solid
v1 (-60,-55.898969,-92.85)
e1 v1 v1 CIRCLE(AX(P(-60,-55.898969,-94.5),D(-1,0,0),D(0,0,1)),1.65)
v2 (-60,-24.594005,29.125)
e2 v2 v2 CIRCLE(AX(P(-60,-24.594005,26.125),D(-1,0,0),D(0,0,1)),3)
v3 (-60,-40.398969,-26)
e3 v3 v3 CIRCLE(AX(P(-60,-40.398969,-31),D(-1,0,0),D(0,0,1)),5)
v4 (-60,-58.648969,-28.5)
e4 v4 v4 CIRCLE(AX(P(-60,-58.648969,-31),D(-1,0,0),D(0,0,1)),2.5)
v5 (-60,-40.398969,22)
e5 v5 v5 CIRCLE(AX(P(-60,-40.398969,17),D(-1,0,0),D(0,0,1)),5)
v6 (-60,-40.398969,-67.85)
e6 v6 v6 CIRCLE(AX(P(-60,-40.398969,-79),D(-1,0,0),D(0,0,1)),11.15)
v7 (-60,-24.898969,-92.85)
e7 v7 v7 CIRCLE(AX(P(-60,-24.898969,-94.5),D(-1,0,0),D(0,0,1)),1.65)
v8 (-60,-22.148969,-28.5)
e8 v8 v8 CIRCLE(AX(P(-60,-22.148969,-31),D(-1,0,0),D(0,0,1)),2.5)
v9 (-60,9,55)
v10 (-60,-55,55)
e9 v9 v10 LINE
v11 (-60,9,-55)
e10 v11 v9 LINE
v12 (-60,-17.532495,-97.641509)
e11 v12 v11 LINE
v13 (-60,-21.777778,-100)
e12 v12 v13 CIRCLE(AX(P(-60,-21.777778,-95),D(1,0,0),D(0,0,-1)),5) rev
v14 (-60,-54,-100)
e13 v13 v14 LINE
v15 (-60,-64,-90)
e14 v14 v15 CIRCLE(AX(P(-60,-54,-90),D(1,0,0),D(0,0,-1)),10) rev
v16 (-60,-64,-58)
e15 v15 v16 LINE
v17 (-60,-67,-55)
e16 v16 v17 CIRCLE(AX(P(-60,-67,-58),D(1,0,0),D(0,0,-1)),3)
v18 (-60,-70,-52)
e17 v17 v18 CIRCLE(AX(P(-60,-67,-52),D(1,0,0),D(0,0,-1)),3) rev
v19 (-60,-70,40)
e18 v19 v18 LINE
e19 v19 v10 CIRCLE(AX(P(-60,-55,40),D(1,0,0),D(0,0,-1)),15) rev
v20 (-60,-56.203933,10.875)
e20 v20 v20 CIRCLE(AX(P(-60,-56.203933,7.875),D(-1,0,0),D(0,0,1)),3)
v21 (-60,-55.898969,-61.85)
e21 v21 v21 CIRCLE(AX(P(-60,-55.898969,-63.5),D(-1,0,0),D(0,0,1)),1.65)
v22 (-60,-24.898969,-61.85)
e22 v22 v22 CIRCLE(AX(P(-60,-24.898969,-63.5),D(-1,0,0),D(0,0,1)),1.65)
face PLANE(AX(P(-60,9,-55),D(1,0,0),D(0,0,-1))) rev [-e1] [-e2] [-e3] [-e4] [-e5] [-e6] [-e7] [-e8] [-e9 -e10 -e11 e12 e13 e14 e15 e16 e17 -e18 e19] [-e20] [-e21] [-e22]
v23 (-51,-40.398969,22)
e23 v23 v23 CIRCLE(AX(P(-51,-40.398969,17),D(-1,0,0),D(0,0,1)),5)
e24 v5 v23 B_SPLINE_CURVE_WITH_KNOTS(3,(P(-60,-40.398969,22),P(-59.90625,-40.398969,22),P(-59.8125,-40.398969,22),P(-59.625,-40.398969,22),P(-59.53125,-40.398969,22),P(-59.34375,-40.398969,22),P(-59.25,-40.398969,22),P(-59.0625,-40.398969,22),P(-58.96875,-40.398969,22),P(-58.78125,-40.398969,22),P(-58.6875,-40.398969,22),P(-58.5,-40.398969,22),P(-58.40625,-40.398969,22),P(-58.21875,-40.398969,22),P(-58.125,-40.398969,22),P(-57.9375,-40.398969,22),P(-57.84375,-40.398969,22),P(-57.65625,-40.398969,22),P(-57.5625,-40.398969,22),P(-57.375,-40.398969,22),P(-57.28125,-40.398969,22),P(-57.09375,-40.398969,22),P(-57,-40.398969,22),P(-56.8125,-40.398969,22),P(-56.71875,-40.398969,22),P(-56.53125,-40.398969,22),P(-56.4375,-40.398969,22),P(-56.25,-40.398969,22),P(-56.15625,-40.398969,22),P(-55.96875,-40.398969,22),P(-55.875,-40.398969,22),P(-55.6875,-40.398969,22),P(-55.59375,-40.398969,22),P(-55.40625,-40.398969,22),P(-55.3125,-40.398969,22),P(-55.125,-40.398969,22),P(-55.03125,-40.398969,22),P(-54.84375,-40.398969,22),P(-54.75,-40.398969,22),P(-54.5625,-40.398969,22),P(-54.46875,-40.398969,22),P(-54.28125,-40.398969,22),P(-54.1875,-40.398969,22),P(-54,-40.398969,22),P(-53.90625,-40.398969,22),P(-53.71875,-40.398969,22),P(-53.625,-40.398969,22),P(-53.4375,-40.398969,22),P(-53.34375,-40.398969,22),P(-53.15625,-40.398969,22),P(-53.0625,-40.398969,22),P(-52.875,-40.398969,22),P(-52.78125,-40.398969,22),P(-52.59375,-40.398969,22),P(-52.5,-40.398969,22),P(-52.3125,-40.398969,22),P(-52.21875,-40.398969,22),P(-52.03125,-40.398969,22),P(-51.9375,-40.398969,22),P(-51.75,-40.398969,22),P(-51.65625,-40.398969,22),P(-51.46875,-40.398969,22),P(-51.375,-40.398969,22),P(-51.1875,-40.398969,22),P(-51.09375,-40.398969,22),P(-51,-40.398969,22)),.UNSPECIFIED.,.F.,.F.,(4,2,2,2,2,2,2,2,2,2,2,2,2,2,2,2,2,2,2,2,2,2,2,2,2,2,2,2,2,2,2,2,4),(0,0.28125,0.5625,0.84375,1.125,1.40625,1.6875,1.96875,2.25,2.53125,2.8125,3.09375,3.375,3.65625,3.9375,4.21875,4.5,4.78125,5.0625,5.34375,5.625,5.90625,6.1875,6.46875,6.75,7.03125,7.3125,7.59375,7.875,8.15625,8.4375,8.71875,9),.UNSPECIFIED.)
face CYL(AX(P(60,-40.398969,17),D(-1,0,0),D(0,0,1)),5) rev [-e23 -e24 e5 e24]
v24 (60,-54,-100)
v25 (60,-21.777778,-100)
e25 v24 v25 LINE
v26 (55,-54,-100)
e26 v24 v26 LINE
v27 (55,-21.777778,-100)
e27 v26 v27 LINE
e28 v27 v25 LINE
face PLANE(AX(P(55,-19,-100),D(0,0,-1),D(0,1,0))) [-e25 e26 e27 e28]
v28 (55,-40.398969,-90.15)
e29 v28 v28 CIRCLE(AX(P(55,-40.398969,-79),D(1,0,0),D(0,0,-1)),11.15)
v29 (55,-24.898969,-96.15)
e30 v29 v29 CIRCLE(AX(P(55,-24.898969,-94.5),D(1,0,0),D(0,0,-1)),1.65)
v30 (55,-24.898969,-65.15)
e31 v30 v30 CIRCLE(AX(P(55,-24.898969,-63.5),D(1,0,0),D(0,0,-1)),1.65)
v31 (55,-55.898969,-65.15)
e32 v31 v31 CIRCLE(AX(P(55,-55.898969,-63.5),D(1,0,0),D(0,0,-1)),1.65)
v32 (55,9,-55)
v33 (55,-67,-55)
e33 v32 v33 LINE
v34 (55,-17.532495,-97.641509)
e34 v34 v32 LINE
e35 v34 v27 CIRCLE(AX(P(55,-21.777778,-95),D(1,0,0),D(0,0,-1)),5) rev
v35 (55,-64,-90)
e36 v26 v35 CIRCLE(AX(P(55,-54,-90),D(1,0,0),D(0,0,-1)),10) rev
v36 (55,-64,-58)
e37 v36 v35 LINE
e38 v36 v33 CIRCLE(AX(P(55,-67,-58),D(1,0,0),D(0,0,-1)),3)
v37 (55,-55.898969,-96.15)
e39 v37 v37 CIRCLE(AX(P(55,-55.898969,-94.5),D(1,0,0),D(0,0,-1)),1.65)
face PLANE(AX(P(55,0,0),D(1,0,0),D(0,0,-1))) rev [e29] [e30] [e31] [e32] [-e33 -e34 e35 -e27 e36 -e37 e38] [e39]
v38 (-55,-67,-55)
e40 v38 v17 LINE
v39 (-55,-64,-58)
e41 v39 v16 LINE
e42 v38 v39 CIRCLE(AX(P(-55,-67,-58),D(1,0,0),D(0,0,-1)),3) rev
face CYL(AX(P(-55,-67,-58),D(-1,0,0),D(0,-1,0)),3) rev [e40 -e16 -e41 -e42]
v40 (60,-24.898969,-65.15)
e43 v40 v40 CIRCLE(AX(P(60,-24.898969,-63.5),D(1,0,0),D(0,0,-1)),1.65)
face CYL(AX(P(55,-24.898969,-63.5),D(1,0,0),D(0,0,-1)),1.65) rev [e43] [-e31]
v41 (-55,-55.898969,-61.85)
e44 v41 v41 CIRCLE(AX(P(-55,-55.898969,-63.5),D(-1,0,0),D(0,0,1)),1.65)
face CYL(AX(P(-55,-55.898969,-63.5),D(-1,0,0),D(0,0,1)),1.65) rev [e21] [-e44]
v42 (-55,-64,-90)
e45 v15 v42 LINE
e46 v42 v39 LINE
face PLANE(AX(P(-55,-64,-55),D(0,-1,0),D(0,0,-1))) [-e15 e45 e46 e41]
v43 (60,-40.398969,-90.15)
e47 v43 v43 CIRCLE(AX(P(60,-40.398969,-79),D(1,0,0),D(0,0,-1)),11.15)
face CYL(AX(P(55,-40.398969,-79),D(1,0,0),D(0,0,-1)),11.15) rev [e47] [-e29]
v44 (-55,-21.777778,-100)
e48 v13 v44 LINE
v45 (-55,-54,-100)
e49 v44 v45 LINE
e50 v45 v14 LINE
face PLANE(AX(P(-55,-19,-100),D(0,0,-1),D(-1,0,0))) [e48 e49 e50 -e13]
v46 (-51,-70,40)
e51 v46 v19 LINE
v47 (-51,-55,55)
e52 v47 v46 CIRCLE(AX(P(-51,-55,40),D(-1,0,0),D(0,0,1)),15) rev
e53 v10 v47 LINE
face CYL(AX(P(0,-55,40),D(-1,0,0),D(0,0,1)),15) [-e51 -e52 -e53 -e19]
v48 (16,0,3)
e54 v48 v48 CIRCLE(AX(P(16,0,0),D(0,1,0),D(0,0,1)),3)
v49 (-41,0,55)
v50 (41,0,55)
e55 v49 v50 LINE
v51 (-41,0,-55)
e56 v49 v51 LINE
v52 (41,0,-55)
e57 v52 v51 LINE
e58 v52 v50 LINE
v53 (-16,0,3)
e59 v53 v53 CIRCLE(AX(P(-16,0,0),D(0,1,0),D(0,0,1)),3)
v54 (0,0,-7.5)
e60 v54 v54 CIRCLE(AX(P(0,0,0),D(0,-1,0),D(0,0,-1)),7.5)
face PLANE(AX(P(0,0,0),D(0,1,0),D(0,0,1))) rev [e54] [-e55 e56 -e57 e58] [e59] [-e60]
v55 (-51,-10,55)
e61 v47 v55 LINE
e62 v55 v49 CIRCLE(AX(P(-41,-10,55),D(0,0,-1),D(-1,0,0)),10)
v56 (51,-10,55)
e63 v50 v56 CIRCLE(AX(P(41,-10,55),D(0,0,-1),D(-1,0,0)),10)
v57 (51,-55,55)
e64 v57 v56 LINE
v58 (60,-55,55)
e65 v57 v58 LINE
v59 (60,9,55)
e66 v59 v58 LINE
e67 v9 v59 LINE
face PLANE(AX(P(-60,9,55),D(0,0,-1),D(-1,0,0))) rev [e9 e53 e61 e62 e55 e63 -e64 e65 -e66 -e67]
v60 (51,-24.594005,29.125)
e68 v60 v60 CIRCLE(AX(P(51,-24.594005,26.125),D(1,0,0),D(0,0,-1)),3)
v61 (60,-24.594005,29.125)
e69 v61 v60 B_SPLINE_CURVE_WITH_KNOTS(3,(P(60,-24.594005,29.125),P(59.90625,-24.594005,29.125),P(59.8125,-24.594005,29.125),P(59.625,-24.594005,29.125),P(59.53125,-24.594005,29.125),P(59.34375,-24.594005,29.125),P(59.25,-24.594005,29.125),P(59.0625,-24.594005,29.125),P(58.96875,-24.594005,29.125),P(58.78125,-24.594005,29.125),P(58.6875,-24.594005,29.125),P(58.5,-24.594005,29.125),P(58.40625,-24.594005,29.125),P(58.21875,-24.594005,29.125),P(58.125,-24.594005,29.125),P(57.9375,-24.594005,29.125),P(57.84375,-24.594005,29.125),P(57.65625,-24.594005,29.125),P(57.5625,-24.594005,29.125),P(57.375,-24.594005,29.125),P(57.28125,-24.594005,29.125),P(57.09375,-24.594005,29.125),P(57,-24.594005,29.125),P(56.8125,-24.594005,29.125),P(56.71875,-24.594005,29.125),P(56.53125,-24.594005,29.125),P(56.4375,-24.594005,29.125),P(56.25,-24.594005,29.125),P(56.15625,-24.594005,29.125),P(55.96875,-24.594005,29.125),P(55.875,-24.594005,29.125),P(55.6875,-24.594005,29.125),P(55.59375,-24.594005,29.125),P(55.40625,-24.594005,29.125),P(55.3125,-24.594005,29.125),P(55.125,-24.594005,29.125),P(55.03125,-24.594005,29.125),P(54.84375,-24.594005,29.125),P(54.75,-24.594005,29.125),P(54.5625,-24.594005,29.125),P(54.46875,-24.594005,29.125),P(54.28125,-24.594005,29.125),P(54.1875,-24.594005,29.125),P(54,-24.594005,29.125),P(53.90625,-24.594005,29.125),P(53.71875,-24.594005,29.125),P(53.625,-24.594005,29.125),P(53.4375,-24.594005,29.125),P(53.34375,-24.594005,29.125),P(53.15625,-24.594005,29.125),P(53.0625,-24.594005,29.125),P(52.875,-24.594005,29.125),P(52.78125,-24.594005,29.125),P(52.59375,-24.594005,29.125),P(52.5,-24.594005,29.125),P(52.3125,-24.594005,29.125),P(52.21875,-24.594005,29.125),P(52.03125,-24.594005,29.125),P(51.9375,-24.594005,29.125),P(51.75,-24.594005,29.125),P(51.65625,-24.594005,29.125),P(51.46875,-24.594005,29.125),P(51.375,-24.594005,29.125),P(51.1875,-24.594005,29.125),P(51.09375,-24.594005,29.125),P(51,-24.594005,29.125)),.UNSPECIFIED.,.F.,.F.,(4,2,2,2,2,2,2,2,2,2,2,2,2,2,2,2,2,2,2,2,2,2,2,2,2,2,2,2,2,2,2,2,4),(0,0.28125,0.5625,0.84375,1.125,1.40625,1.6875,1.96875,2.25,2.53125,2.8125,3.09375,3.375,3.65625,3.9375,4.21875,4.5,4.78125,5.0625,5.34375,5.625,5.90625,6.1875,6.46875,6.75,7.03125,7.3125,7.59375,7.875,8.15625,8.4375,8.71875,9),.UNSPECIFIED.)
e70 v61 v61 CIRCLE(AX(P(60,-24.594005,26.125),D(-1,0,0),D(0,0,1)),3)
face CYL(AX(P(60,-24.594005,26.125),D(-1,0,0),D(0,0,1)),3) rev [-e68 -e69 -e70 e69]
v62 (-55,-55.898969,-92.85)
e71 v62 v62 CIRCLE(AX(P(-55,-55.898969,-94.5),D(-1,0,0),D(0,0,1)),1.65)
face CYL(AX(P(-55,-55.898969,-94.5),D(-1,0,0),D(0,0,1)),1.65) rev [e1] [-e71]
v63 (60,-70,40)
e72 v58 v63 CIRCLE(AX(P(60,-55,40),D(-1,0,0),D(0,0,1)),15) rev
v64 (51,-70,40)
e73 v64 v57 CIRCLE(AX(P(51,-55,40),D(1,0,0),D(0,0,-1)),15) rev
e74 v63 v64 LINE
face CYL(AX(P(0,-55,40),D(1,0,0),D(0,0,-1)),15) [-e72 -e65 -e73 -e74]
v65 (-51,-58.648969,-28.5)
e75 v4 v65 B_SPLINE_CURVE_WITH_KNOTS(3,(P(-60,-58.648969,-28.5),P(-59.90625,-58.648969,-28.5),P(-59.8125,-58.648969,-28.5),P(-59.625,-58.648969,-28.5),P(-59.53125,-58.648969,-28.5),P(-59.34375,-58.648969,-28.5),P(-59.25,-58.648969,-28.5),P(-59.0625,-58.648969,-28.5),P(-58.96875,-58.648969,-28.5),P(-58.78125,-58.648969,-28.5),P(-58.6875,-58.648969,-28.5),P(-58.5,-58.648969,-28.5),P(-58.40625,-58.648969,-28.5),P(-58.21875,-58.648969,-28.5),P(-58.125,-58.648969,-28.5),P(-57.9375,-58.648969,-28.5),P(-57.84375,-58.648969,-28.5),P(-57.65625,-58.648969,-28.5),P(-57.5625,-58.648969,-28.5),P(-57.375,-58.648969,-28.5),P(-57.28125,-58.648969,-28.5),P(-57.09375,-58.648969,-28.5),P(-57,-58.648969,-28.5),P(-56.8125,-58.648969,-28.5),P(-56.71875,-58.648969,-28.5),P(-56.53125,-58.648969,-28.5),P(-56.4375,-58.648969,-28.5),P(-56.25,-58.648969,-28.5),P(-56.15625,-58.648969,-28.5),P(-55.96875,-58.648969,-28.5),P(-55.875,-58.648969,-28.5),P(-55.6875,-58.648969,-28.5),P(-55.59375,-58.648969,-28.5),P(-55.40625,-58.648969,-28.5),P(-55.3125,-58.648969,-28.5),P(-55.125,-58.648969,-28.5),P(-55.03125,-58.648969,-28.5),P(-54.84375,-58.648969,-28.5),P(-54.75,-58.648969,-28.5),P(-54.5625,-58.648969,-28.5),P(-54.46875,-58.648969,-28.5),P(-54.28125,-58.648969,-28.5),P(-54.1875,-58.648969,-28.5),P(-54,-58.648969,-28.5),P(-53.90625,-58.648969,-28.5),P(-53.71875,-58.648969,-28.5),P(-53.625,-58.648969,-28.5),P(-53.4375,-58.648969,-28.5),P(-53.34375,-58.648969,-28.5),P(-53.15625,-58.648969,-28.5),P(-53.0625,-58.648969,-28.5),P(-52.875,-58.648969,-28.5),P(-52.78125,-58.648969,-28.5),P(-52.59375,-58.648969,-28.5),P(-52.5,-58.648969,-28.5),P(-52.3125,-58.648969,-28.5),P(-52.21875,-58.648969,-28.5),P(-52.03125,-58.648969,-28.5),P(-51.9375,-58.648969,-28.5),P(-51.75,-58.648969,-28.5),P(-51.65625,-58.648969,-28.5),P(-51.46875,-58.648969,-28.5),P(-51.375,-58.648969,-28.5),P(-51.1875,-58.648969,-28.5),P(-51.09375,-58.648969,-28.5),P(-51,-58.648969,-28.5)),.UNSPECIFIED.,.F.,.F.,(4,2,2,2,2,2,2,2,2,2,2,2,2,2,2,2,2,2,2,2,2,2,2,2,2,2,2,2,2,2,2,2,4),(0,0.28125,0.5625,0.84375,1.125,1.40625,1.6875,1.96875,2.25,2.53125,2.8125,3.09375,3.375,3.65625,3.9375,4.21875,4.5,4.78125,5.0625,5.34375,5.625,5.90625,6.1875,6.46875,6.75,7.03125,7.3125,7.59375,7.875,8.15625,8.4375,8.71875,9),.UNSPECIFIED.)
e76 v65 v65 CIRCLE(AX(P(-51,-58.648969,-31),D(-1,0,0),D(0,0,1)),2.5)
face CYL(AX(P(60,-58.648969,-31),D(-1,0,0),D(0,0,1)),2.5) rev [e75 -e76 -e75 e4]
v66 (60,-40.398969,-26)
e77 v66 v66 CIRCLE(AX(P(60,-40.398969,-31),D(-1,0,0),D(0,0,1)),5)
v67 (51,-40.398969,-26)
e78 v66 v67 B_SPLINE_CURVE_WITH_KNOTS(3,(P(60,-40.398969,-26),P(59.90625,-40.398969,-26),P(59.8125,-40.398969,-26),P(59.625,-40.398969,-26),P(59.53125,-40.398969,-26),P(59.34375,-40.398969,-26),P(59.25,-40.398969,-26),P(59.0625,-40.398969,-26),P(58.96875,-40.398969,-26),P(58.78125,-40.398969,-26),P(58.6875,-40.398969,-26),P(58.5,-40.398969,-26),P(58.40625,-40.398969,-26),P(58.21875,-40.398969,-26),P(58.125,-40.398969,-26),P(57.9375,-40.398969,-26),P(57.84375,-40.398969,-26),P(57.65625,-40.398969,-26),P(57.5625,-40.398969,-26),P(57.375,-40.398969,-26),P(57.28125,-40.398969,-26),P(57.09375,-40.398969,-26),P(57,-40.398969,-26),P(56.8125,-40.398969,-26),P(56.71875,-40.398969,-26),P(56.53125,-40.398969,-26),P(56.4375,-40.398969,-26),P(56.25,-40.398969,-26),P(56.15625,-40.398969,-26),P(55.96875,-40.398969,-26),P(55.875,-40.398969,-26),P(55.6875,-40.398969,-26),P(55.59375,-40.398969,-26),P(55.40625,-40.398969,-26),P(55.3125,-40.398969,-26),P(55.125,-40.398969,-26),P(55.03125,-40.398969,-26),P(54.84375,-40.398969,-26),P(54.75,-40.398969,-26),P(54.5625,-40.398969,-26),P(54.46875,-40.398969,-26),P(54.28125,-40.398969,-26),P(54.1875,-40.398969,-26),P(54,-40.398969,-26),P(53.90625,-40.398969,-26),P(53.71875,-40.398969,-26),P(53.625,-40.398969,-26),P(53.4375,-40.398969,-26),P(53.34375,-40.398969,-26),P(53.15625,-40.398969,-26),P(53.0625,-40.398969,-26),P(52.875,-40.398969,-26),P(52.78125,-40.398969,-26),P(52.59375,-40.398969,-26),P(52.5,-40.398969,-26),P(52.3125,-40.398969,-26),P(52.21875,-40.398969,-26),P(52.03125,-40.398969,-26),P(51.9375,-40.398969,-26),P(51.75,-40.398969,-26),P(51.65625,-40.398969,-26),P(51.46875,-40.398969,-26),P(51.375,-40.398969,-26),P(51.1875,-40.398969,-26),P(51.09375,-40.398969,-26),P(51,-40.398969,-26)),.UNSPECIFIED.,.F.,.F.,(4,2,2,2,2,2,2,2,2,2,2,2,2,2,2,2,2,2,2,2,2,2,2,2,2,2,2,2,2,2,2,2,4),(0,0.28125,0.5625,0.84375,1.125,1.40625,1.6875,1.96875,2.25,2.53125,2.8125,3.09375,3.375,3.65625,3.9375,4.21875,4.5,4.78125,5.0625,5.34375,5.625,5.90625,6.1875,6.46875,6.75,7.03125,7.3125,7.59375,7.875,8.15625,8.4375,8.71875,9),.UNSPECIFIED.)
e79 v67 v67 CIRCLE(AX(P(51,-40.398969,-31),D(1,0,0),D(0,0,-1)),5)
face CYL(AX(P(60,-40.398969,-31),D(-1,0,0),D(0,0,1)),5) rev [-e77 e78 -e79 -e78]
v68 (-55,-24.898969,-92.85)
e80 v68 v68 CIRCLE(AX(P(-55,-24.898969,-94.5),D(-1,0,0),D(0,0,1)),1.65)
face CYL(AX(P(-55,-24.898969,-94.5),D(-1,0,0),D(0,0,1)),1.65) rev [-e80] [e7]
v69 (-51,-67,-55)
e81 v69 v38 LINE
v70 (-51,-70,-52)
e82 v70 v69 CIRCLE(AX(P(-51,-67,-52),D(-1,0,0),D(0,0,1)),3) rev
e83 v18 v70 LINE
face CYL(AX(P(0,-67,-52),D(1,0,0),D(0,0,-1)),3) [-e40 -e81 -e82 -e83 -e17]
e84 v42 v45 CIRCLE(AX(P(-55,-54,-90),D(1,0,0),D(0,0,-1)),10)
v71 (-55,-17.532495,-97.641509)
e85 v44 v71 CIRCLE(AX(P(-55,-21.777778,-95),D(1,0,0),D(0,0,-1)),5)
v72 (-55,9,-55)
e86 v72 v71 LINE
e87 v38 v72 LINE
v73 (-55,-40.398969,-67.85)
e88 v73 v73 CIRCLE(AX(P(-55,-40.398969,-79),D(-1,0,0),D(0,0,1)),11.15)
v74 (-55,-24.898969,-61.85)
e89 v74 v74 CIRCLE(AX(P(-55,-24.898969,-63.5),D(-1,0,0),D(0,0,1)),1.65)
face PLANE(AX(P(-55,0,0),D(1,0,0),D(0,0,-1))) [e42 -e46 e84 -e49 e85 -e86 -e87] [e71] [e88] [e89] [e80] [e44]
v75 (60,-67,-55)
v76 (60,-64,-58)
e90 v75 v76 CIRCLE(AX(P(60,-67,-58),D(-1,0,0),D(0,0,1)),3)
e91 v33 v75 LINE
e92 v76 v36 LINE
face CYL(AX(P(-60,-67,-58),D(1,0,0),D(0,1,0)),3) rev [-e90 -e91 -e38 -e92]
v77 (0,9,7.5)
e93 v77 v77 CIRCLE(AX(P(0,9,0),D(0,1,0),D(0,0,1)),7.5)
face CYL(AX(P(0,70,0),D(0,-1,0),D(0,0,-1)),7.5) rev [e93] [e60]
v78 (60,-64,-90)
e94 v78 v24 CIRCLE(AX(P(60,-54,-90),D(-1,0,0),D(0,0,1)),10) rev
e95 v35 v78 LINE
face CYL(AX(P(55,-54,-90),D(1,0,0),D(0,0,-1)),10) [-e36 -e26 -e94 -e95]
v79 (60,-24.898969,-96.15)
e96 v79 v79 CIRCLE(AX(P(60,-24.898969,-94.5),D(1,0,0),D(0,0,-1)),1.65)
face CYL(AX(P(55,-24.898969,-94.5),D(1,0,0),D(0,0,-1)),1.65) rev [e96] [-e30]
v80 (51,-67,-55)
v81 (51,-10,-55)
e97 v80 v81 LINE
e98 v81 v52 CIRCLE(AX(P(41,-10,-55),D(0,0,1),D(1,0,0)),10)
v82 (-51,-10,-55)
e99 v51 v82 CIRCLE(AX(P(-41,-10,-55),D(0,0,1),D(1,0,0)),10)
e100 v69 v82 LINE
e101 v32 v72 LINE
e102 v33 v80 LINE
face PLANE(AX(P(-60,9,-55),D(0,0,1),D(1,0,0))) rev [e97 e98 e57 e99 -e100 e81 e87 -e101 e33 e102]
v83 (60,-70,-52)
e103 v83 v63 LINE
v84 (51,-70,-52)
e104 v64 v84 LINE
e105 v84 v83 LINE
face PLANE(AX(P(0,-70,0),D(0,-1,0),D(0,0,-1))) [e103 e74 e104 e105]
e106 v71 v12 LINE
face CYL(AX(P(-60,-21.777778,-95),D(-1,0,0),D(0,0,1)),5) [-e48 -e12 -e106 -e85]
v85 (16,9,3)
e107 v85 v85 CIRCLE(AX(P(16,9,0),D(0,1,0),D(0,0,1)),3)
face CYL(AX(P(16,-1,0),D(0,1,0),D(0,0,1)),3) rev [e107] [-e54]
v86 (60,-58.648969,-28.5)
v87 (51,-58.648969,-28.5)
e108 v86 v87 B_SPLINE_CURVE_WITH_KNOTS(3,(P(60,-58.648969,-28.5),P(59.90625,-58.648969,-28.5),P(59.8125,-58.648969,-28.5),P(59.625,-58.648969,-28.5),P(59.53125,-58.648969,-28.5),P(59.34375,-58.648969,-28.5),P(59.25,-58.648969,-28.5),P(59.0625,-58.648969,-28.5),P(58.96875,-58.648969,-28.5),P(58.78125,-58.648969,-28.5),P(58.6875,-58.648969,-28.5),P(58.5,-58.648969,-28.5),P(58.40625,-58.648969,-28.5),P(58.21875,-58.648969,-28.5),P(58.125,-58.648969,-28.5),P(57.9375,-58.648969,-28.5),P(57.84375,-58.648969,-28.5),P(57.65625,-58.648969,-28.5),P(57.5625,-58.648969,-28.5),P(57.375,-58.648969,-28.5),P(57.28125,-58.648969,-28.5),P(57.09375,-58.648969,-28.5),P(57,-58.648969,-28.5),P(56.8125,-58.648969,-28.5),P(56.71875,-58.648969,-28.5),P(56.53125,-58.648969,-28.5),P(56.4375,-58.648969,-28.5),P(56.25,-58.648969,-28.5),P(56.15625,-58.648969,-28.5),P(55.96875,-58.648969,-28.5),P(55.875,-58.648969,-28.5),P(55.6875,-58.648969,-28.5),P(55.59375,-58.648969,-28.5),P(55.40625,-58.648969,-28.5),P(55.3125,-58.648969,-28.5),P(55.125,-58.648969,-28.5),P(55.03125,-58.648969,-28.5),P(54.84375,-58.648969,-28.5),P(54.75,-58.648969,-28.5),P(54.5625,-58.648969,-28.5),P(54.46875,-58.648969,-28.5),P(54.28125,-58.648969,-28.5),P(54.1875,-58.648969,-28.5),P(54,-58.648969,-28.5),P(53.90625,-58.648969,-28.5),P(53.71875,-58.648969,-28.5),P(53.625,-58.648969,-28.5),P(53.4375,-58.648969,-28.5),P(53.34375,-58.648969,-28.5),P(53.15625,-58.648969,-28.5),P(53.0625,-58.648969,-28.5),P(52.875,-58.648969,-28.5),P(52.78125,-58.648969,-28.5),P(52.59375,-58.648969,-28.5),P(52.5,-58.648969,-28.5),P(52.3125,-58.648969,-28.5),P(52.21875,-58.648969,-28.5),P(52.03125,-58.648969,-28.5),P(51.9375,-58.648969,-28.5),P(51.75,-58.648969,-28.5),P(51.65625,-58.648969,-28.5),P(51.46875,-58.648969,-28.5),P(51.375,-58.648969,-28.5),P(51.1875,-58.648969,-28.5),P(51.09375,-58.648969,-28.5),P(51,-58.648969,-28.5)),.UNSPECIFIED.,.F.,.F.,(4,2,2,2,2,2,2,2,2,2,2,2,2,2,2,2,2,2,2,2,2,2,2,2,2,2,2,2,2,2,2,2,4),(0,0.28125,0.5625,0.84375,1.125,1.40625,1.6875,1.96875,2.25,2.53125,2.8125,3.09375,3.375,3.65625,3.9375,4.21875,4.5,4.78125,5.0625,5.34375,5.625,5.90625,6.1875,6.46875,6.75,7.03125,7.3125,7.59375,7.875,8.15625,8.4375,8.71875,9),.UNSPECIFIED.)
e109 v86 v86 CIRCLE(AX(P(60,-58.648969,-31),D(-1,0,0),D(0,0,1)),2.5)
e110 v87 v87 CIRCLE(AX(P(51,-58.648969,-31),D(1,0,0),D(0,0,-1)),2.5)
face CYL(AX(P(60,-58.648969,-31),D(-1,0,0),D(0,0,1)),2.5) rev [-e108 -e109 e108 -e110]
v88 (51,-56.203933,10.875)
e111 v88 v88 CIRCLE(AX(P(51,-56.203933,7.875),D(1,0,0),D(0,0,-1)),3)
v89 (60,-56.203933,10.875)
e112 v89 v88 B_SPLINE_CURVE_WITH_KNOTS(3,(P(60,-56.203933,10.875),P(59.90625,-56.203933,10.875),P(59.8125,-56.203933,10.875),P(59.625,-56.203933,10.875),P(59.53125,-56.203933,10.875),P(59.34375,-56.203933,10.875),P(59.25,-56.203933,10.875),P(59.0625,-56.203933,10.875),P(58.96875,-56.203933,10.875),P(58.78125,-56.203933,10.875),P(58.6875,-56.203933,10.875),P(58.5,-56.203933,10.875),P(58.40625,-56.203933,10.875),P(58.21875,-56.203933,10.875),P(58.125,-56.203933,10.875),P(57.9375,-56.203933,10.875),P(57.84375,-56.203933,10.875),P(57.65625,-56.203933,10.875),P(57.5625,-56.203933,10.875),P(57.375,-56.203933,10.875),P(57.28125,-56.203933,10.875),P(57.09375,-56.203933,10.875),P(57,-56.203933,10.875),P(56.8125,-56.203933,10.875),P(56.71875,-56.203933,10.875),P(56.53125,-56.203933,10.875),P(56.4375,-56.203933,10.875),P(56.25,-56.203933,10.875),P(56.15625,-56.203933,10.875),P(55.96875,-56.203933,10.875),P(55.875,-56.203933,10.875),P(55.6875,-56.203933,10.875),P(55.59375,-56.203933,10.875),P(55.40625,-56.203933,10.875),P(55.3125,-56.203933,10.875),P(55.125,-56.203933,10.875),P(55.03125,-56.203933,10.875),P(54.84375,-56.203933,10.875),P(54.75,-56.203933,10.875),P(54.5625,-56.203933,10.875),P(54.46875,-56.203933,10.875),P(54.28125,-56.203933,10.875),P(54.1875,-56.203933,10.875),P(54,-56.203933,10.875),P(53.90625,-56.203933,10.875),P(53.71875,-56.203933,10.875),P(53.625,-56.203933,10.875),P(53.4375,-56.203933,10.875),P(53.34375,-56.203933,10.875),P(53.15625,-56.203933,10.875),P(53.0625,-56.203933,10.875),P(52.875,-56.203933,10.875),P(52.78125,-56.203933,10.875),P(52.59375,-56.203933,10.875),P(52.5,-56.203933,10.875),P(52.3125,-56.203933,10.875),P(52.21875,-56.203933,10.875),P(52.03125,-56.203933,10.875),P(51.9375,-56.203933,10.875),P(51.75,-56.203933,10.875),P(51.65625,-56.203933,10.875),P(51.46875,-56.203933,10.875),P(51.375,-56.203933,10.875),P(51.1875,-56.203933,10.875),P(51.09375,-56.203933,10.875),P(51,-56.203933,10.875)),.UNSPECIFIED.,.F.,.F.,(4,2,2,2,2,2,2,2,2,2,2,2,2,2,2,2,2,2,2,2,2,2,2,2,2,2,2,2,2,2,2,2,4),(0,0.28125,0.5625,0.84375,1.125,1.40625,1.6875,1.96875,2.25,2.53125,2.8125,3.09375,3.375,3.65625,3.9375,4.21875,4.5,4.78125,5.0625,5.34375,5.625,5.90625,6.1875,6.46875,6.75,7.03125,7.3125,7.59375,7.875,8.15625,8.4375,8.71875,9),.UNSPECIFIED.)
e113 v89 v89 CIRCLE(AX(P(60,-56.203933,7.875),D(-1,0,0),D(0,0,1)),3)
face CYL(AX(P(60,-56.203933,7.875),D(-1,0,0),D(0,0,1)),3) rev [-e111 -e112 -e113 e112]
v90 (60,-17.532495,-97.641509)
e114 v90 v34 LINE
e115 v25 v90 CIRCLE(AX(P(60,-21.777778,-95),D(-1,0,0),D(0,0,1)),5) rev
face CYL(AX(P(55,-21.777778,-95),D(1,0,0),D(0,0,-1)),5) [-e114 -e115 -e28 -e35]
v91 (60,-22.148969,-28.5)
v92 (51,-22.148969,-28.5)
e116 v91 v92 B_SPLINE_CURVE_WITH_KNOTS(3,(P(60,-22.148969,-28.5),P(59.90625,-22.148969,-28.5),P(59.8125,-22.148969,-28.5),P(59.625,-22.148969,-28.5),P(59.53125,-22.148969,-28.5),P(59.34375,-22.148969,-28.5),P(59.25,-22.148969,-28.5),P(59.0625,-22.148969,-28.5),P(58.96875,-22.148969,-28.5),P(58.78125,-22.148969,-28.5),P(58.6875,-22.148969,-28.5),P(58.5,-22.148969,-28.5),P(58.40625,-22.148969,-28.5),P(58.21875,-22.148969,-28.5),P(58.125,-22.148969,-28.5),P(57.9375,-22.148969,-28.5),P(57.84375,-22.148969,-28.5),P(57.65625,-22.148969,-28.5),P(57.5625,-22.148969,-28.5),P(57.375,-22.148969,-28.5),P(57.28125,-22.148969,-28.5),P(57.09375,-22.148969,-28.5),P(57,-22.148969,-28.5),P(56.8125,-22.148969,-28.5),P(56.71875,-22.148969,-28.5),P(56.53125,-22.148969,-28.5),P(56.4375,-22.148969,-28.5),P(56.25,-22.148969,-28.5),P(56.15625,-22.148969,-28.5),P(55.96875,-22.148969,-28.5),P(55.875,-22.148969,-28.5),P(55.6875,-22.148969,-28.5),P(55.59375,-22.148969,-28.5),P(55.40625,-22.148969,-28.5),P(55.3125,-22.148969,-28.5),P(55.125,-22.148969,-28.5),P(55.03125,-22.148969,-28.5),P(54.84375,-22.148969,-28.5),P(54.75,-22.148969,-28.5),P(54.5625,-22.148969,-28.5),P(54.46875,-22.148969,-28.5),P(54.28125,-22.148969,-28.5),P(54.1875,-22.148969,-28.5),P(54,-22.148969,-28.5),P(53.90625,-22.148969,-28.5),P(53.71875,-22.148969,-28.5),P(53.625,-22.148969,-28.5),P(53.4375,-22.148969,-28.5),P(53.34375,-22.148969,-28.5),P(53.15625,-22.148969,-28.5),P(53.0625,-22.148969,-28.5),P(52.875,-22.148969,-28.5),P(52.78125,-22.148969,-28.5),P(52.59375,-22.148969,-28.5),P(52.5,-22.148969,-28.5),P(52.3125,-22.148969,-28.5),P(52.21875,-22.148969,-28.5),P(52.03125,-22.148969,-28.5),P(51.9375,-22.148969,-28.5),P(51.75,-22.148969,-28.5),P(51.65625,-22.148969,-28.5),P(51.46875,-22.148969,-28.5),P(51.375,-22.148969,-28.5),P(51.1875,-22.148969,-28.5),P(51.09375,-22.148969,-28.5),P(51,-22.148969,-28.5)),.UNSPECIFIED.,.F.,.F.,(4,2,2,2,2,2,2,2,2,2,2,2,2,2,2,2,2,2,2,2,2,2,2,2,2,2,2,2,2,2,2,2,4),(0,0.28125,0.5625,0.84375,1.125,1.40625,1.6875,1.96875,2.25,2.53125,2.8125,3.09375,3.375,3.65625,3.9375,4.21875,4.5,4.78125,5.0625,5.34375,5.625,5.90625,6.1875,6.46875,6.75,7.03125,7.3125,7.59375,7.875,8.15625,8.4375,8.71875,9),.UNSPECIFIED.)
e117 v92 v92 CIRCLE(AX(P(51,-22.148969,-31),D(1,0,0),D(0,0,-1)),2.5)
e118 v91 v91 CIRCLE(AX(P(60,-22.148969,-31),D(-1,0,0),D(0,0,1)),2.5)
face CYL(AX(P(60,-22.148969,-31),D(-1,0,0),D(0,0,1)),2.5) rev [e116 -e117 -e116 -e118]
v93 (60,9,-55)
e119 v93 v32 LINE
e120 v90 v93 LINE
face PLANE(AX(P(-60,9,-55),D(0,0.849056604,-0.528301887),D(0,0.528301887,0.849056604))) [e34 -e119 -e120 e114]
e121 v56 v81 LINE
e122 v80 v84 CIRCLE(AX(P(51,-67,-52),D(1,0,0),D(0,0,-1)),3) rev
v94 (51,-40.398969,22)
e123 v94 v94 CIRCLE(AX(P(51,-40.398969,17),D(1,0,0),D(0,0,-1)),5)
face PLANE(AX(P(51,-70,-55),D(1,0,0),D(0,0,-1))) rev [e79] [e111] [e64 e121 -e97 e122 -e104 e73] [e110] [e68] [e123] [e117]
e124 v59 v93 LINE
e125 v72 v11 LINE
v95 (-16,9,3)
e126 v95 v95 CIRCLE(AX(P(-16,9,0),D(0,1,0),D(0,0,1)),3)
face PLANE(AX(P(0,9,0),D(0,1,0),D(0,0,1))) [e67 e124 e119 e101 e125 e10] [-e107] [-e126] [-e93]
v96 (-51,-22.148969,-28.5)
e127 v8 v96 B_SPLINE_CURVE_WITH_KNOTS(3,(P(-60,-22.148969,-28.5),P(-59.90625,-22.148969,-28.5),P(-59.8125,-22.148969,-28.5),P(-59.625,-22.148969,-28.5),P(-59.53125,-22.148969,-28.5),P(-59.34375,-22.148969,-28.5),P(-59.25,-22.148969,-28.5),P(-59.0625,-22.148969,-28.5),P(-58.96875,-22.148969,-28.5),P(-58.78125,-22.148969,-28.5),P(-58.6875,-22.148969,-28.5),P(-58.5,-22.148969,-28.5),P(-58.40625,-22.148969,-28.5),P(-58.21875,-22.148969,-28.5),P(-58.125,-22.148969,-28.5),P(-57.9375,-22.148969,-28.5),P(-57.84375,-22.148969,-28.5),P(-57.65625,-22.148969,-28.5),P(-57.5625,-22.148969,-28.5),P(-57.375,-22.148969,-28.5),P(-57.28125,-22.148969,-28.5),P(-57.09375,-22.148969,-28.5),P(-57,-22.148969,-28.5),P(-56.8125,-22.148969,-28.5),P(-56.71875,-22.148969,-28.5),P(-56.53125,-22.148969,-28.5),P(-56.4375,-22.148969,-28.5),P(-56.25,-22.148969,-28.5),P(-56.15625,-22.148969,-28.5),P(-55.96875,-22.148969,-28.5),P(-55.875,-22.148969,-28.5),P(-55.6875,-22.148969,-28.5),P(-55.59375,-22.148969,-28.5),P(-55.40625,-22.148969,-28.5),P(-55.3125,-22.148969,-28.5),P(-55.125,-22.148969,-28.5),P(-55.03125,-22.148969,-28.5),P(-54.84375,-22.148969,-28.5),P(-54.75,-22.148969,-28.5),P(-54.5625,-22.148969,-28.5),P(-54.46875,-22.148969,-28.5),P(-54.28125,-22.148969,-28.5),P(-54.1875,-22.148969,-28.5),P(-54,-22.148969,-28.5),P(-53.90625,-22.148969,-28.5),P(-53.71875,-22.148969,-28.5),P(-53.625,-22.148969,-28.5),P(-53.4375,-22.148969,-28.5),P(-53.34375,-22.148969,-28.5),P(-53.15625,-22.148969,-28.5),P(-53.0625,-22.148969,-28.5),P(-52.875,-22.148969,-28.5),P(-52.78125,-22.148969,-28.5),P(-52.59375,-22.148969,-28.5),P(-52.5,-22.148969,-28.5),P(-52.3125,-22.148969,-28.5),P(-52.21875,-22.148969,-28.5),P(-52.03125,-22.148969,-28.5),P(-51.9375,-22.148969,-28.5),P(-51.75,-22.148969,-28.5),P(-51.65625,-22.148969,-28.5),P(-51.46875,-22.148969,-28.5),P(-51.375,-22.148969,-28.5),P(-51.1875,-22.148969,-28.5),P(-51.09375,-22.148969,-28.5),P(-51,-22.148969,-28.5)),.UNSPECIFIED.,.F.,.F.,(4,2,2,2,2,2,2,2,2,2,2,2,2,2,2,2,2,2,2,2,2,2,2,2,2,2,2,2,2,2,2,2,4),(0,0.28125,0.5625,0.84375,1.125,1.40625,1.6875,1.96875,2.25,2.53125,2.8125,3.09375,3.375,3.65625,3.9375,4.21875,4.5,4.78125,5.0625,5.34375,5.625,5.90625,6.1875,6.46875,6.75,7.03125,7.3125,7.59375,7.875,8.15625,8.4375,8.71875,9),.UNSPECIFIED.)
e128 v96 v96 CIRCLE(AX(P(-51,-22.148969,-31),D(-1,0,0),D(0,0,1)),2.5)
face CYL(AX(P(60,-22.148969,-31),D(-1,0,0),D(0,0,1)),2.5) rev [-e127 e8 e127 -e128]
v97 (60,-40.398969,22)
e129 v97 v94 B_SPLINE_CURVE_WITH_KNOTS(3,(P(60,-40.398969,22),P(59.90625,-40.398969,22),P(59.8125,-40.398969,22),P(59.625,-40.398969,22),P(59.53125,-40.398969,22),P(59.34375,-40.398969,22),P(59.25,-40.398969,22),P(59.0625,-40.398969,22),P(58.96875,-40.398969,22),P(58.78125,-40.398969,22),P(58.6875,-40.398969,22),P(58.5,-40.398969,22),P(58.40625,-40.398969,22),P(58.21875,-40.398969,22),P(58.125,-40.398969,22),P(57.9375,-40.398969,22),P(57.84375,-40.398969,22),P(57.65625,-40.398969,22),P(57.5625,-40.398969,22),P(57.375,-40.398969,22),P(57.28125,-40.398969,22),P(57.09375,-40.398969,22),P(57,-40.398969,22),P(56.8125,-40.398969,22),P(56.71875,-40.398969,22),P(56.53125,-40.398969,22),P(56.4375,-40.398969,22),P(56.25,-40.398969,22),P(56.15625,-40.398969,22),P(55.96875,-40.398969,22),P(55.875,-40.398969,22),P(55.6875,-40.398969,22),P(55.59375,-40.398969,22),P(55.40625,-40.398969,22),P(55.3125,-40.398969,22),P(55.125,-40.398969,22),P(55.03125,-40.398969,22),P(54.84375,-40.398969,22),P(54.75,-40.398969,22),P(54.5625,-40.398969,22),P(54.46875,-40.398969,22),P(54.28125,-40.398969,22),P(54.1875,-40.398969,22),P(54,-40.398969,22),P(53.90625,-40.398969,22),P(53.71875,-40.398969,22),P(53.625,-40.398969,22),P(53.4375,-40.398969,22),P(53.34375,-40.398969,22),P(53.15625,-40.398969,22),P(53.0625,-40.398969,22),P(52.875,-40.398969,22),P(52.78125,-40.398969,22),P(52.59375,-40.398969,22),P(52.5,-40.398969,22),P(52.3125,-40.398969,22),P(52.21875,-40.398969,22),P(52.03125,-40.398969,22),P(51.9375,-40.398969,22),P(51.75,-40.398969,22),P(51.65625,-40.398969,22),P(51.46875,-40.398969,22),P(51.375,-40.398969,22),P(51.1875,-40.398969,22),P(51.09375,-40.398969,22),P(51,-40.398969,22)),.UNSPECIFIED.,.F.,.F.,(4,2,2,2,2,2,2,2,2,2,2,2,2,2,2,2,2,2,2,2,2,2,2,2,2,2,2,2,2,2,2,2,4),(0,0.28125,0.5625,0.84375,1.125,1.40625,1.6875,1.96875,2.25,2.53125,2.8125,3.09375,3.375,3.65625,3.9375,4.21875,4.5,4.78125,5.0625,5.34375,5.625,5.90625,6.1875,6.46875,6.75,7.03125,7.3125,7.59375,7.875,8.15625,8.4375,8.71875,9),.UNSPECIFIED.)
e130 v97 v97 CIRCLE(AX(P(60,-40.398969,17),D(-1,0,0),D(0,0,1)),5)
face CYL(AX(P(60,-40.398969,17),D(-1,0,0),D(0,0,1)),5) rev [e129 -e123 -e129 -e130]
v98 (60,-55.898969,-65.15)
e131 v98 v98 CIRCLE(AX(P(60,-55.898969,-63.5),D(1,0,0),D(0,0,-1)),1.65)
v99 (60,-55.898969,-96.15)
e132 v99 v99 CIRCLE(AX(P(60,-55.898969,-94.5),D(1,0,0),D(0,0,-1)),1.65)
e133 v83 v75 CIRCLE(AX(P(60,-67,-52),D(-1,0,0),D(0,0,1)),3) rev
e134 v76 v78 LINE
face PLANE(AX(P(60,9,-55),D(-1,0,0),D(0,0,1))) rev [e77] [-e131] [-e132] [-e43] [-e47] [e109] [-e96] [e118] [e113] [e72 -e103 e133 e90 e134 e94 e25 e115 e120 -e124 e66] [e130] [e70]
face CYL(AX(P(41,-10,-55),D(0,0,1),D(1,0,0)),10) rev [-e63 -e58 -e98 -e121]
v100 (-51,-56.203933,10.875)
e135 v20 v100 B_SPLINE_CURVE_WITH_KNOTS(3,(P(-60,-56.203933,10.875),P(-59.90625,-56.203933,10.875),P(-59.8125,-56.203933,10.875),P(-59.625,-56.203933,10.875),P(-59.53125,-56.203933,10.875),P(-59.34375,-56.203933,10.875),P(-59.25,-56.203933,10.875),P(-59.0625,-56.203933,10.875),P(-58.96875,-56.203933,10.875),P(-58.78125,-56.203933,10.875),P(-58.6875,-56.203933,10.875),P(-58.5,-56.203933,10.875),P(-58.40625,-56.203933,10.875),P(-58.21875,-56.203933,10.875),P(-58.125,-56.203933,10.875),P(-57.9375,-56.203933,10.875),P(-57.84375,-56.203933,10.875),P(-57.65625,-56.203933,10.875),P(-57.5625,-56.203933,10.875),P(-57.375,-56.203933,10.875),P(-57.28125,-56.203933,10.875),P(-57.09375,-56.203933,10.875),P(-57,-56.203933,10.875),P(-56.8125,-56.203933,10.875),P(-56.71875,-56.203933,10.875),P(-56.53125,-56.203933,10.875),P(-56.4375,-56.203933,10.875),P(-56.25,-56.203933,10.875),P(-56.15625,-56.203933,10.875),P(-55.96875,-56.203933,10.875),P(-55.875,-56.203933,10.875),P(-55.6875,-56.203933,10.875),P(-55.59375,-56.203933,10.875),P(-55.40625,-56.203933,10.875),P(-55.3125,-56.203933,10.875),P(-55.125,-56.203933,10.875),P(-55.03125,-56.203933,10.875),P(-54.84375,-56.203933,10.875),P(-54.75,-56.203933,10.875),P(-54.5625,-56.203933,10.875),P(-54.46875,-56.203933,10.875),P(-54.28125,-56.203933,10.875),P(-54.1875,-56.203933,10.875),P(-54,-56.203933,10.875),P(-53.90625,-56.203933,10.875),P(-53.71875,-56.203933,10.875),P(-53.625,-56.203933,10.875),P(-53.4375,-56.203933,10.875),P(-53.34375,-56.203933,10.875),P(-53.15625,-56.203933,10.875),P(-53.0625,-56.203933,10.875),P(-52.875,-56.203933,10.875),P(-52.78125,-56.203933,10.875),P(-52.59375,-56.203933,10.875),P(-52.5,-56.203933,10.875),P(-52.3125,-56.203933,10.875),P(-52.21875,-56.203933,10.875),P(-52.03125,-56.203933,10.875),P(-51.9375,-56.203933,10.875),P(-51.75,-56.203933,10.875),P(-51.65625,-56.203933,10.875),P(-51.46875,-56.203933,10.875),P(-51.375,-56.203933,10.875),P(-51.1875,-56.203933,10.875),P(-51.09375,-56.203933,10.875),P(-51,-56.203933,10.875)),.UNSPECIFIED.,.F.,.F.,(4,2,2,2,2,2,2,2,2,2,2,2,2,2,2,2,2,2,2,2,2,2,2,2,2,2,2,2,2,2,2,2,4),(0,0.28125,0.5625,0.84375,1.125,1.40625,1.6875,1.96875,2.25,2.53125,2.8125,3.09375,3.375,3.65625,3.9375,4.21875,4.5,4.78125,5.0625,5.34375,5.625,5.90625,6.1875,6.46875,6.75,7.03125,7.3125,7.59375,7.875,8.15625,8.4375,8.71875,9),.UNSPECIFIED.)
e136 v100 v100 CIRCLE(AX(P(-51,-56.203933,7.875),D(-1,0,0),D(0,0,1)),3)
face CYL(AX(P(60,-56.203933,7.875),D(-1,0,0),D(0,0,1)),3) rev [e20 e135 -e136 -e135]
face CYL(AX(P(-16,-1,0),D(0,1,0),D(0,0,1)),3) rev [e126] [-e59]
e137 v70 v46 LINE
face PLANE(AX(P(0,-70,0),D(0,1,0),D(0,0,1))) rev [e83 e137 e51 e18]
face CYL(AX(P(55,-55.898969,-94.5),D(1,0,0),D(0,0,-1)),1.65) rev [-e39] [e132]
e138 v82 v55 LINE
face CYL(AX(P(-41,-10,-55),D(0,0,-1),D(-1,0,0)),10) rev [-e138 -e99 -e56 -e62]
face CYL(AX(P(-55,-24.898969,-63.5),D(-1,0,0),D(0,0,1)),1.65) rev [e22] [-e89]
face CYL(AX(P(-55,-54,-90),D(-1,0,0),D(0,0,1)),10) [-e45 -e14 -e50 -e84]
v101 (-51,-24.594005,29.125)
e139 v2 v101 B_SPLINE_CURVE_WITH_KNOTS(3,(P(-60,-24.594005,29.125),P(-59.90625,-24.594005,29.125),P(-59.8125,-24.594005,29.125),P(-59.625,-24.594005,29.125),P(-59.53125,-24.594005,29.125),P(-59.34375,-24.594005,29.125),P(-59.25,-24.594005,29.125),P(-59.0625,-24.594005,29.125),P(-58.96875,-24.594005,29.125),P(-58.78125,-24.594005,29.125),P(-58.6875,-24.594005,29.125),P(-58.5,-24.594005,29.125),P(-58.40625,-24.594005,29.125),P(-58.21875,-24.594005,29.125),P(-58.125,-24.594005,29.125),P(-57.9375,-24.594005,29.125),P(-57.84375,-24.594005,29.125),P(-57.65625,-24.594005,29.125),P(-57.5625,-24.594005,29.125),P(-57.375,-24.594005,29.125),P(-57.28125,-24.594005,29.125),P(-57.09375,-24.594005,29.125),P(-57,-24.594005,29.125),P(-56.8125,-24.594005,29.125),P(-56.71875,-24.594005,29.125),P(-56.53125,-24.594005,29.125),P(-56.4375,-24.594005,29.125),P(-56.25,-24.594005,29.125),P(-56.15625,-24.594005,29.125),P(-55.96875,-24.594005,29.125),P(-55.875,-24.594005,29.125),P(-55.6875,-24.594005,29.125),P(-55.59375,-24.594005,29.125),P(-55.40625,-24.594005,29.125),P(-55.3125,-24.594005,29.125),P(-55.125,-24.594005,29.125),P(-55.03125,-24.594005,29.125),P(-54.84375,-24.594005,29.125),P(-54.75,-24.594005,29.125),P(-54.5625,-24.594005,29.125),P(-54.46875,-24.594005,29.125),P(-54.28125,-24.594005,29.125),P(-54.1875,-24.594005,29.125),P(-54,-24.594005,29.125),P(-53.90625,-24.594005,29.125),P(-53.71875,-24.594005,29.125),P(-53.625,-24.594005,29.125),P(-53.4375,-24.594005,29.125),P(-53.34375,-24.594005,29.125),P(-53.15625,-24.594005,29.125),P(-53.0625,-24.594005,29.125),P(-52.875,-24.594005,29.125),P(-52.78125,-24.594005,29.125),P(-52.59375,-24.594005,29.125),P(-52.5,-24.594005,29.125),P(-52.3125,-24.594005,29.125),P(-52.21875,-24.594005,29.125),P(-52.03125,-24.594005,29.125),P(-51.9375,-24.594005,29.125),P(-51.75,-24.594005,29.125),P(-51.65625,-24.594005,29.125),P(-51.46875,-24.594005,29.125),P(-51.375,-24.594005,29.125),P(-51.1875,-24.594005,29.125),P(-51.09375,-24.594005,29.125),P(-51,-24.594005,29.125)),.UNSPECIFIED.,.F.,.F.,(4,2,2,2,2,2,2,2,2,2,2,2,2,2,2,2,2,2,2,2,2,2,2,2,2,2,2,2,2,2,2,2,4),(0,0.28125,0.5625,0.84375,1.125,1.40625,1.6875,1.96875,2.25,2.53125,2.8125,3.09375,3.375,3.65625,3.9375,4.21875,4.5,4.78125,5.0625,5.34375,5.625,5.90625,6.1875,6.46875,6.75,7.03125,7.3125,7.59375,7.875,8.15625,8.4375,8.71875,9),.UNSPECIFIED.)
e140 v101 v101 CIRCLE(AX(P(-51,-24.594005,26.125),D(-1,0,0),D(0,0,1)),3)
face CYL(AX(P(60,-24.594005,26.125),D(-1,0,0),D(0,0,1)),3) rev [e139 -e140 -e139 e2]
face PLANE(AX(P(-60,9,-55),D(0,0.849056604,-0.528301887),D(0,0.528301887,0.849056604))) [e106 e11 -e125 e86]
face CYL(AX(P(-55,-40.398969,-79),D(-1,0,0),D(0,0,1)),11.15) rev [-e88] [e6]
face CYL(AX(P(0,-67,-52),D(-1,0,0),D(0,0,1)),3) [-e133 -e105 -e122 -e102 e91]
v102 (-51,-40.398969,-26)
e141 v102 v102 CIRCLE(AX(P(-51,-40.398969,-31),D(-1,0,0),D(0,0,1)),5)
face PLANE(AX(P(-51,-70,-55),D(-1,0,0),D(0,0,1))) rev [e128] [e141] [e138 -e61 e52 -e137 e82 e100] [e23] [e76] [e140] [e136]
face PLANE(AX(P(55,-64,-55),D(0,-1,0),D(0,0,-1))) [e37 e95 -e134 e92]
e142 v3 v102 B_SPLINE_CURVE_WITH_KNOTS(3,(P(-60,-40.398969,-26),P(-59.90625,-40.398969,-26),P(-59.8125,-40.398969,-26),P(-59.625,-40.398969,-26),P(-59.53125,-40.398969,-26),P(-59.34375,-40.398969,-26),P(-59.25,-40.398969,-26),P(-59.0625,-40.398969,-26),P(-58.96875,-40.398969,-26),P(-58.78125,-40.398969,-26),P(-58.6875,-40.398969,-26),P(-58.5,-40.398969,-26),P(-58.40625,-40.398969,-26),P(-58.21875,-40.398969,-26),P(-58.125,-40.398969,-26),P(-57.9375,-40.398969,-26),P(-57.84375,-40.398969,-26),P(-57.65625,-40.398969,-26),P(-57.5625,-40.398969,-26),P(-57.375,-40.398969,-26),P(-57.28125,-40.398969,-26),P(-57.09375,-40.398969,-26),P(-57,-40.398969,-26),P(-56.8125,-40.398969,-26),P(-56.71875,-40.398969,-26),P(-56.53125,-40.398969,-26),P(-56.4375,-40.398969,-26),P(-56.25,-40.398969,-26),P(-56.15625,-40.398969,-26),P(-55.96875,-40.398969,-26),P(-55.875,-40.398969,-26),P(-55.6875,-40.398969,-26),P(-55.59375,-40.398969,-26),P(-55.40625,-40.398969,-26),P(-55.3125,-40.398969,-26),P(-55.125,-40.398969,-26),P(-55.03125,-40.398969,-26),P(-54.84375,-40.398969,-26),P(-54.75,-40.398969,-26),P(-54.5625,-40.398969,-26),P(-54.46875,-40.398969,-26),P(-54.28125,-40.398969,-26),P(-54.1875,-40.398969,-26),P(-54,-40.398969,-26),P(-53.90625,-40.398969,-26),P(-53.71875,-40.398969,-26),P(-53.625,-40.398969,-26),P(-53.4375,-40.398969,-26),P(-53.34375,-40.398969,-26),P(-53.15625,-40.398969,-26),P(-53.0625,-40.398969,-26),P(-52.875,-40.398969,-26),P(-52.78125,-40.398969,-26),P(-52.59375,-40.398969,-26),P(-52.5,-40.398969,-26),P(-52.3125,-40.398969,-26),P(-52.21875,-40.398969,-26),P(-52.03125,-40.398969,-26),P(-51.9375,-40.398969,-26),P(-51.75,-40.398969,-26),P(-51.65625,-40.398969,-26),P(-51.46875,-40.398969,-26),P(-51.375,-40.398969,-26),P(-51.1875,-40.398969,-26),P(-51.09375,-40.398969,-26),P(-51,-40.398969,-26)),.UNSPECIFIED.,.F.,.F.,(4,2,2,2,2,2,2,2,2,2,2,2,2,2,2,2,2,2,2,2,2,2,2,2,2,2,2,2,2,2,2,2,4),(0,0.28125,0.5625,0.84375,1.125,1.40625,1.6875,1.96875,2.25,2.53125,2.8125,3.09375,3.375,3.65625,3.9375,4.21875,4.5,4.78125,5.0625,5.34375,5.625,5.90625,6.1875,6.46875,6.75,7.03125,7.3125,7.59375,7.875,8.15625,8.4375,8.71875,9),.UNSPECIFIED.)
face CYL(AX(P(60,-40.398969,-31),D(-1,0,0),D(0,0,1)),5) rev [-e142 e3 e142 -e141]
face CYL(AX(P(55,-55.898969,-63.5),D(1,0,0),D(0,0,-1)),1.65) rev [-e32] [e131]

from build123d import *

# Parameters (mm, degrees)
SKETCH1_W               = 120
SKETCH1_H               = 110
BOSS_EXTRUDE1_DEPTH     = 9
SKETCH2_W               = 9
SKETCH2_H               = 110
BOSS_EXTRUDE2_DEPTH     = 70
SKETCH3_R               = 7.5
CUT_EXTRUDE1_DEPTH      = 70
SKETCH4_R               = 3
SKETCH4_R_2             = 5
SKETCH4_R_3             = 2.5
CUT_EXTRUDE2_DEPTH      = 150.415527975
FILLET1_R               = 10
SKETCH6_R               = 3
CUT_EXTRUDE4_DEPTH      = 10
FILLET2_R               = 15
SKETCH7_W               = 45
SKETCH7_H               = 45
SKETCH7_R               = 1.65
SKETCH7_R_2             = 11.15
BOSS_EXTRUDE3_DEPTH     = 5
BOSS_EXTRUDE4_START     = -5
SKETCH8_W               = 45
SKETCH8_H               = 45
SKETCH8_R               = 1.65
SKETCH8_R_2             = 11.15
BOSS_EXTRUDE4_DEPTH     = 5
FILLET3_R               = 15
FILLET5_R               = 3
BOSS_EXTRUDE5_DEPTH     = 120
CUT_EXTRUDE5_DEPTH      = 51
CUT_EXTRUDE5_DEPTH_BACK = 10
SKETCH11_W              = 110
SKETCH11_H              = 45
FILLET6_R               = 5
FILLET7_R               = 10
BOSS_EXTRUDE6_START     = -5
BOSS_EXTRUDE6_DEPTH     = 5
BOSS_EXTRUDE7_START     = -5
BOSS_EXTRUDE7_DEPTH     = 5


# Some blends are built 0.0001 mm under size
with BuildPart() as part:
    # Sketch1 → Boss-Extrude1 (new body)
    with BuildSketch(Plane(origin=(0, 0, 0), x_dir=(1, 0, 0), z_dir=(0, 1, 0))):
        Rectangle(SKETCH1_W, SKETCH1_H)
    extrude(amount=BOSS_EXTRUDE1_DEPTH)

    # Sketch2 → Boss-Extrude2 (add)
    with BuildSketch(Plane.XZ):
        with Locations((-55.5, 0)):
            Rectangle(SKETCH2_W, SKETCH2_H)
        with Locations((55.5, 0)):
            Rectangle(SKETCH2_W, SKETCH2_H)
    extrude(amount=BOSS_EXTRUDE2_DEPTH)

    # Sketch3 → Cut-Extrude1 (cut)
    with BuildSketch(Plane.XZ):
        with Locations(Location((0, 0, 0), (0, 0, 270))):
            Circle(SKETCH3_R)
    extrude(amount=-CUT_EXTRUDE1_DEPTH, mode=Mode.SUBTRACT)

    # Sketch4 → Cut-Extrude2 (cut, through all)
    with BuildSketch(Plane.ZY.offset(60)):
        with Locations((7.875, -56.203932664)):
            Circle(SKETCH4_R)
        with Locations((26.125, -24.594005426)):
            Circle(SKETCH4_R)
        with Locations((17, -40.398969045)):
            Circle(SKETCH4_R_2)
        with Locations((-31, -22.148969045)):
            Circle(SKETCH4_R_3)
        with Locations((-31, -58.648969045)):
            Circle(SKETCH4_R_3)
        with Locations((-31, -40.398969045)):
            Circle(SKETCH4_R_2)
    extrude(amount=-CUT_EXTRUDE2_DEPTH, mode=Mode.SUBTRACT)

    # Fillet1
    fillet1_edges = [part.edges().sort_by_distance(p)[0] for p in [
        (-51, 0, 0),
        (51, 0, 0),
    ]]
    fillet(fillet1_edges, radius=FILLET1_R)

    # Sketch6 → Cut-Extrude4 (cut)
    with BuildSketch(Plane(origin=(0, 9, 0), x_dir=(1, 0, 0), z_dir=(0, 1, 0))):
        with Locations(Location((-16, 0, 0), (0, 0, 270))):
            Circle(SKETCH6_R)
        with Locations(Location((16, 0, 0), (0, 0, 270))):
            Circle(SKETCH6_R)
    extrude(amount=-CUT_EXTRUDE4_DEPTH, mode=Mode.SUBTRACT)

    # Fillet2
    fillet2_edges = [part.edges().sort_by_distance(p)[0] for p in [
        (-55.5, -70, 55),
        (55.5, -70, 55),
    ]]
    fillet(fillet2_edges, radius=FILLET2_R)

    # Sketch7 → Boss-Extrude3 (add)
    with BuildSketch(Plane(origin=(60, 0, 0), x_dir=(0, 0, -1), z_dir=(1, 0, 0))):
        with Locations((77.5, -41.5)):
            Rectangle(SKETCH7_W, SKETCH7_H)
        with Locations((63.5, -24.898969045)):
            Circle(SKETCH7_R, mode=Mode.SUBTRACT)
        with Locations((94.5, -24.898969045)):
            Circle(SKETCH7_R, mode=Mode.SUBTRACT)
        with Locations((94.5, -55.898969045)):
            Circle(SKETCH7_R, mode=Mode.SUBTRACT)
        with Locations((63.5, -55.898969045)):
            Circle(SKETCH7_R, mode=Mode.SUBTRACT)
        with Locations((79, -40.398969045)):
            Circle(SKETCH7_R_2, mode=Mode.SUBTRACT)
    extrude(amount=-BOSS_EXTRUDE3_DEPTH)

    # Sketch8 → Boss-Extrude4 (add)
    with BuildSketch(Plane.ZY.offset(60).offset(BOSS_EXTRUDE4_START)):
        with Locations((-77.5, -41.5)):
            Rectangle(SKETCH8_W, SKETCH8_H)
        with Locations(Location((-94.5, -24.898969045, 0), (0, 0, 180))):
            Circle(SKETCH8_R, mode=Mode.SUBTRACT)
        with Locations(Location((-63.5, -24.898969045, 0), (0, 0, 180))):
            Circle(SKETCH8_R, mode=Mode.SUBTRACT)
        with Locations(Location((-94.5, -55.898969045, 0), (0, 0, 180))):
            Circle(SKETCH8_R, mode=Mode.SUBTRACT)
        with Locations(Location((-63.5, -55.898969045, 0), (0, 0, 180))):
            Circle(SKETCH8_R, mode=Mode.SUBTRACT)
        with Locations(Location((-79, -40.398969045, 0), (0, 0, 180))):
            Circle(SKETCH8_R_2, mode=Mode.SUBTRACT)
    extrude(amount=BOSS_EXTRUDE4_DEPTH)

    # Fillet3
    fillet3_edges = [part.edges().sort_by_distance(p)[0] for p in [
        (57.5, -19, -55),
        (-57.5, -19, -55),
    ]]
    fillet(fillet3_edges, radius=FILLET3_R)

    # Fillet5
    fillet5_edges = [part.edges().sort_by_distance(p)[0] for p in [
        (-57.5, -64, -55),
        (-55.5, -70, -55),
        (55.5, -70, -55),
        (57.5, -64, -55),
    ]]
    fillet(fillet5_edges, radius=FILLET5_R - 0.0001)  # a hair under: the kernel refuses the full size

    # Sketch10 → Boss-Extrude5 (add)
    with BuildSketch(Plane(origin=(60, 0, 0), x_dir=(0, 0, -1), z_dir=(1, 0, 0))):
        Polygon((55, 9), (100, -19), (90.555773444, -19), (55, 3.123592365), align=None)
    extrude(amount=-BOSS_EXTRUDE5_DEPTH)

    # Sketch11 → Cut-Extrude5 (cut, two sides: drawn at the far end of the back side and taken through both)
    with BuildSketch(Plane(origin=(0, 0, 0), x_dir=(-1, 0, 0), z_dir=(0, -1, 0)).offset(-CUT_EXTRUDE5_DEPTH_BACK)):
        with Locations((0, 77.5)):
            Rectangle(SKETCH11_W, SKETCH11_H)
    extrude(amount=CUT_EXTRUDE5_DEPTH + CUT_EXTRUDE5_DEPTH_BACK, mode=Mode.SUBTRACT)

    # Fillet6
    # the kernel refuses this fillet: 5 mm, written as the material it adds along each edge
    with BuildSketch(Plane(origin=(-55, 3.123592365, -55), x_dir=(0, -1, 0), z_dir=(-1, 0, 0)), Plane(origin=(60, 3.123592365, -55), x_dir=(0, -1, 0), z_dir=(-1, 0, 0))) as fillet6_piece_1:
        with BuildLine():
            CenterArc((FILLET6_R * 1.8, -FILLET6_R), FILLET6_R, 90, 121.890791802)
            Line((FILLET6_R * 0.950943396226, -FILLET6_R * 1.52830188679), (0, 0))
            Line((0, 0), (FILLET6_R * 1.8, 0))
        make_face()
    extrude(amount=5)
    with BuildSketch(Plane(origin=(-55, -19, -90.555773444), x_dir=(0, 0.528301886792453, 0.8490566037735847), z_dir=(-1, 0, 0))) as fillet6_piece_2:
        with BuildLine():
            CenterArc((FILLET6_R * 3.5, -FILLET6_R), FILLET6_R, 90, 148.109208198)
            Line((FILLET6_R * 2.97169811321, -FILLET6_R * 1.84905660377), (0, 0))
            Line((0, 0), (FILLET6_R * 3.5, 0))
        make_face()
    extrude(amount=5)
    with BuildSketch(Plane(origin=(60, -19, -90.555773444), x_dir=(0, 0, 1), z_dir=(-1, 0, 0))) as fillet6_piece_3:
        with BuildLine():
            CenterArc((FILLET6_R * 3.5, FILLET6_R), FILLET6_R, 121.890791802, 148.109208198)
            Line((FILLET6_R * 2.97169811321, FILLET6_R * 1.84905660377), (0, 0))
            Line((0, 0), (FILLET6_R * 3.5, 0))
        make_face()
    extrude(amount=5)
    # the kernel refuses this fillet: 5 mm, written as the material it takes off along each edge
    with BuildSketch(Plane(origin=(-48.055555556, -19, -100), x_dir=(0, 0.5283018867924467, 0.8490566037735887), z_dir=(-1, 0, 0))) as fillet6_2_piece_1:
        with BuildLine():
            CenterArc((FILLET6_R * 0.555555555556, -FILLET6_R), FILLET6_R, 90, 58.109208198)
            Line((-FILLET6_R * 0.293501048218, -FILLET6_R * 0.471698113208), (0, 0))
            Line((0, 0), (FILLET6_R * 0.555555555556, 0))
        make_face()
    extrude(amount=18.888888889, mode=Mode.SUBTRACT)
    with BuildSketch(Plane(origin=(66.944444444, -19, -100), x_dir=(0, -1, 0), z_dir=(-1, 0, 0))) as fillet6_2_piece_2:
        with BuildLine():
            CenterArc((FILLET6_R * 0.555555555556, FILLET6_R), FILLET6_R, 211.890791802, 58.109208198)
            Line((-FILLET6_R * 0.293501048218, FILLET6_R * 0.471698113208), (0, 0))
            Line((0, 0), (FILLET6_R * 0.555555555556, 0))
        make_face()
    extrude(amount=18.888888889, mode=Mode.SUBTRACT)

    # Fillet7
    fillet7_edges = [part.edges().sort_by_distance(p)[0] for p in [
        (57.5, -64, -100),
        (-57.5, -64, -100),
    ]]
    fillet(fillet7_edges, radius=FILLET7_R)

    # Sketch12 → Boss-Extrude6 (add)
    with BuildSketch(Plane.ZY.offset(60).offset(BOSS_EXTRUDE6_START)):
        Polygon((-58.940723001, 2.767041623), (-81.499265811, -11.693562742), (-78.607144938, -21.141157594), (-64.532156689, -21.141157594), (-49.355143029, -12.186463132), (-49.355143029, -1.853525156), align=None)
    extrude(amount=BOSS_EXTRUDE6_DEPTH)

    # Sketch13 → Boss-Extrude7 (add)
    with BuildSketch(Plane(origin=(60, 0, 0), x_dir=(0, 0, -1), z_dir=(1, 0, 0)).offset(BOSS_EXTRUDE7_START)):
        Polygon((56.819834361, 2.885240591), (82.463306102, -10.418515425), (80.920841636, -18.902069986), (69.641570231, -22.372615034), (52.57805708, -14.660292706), (45.05854281, -6.562354261), (48.818299945, 0.68471384), (56.819834361, 0.68471384), align=None)
    extrude(amount=BOSS_EXTRUDE7_DEPTH)


solid = part.part
